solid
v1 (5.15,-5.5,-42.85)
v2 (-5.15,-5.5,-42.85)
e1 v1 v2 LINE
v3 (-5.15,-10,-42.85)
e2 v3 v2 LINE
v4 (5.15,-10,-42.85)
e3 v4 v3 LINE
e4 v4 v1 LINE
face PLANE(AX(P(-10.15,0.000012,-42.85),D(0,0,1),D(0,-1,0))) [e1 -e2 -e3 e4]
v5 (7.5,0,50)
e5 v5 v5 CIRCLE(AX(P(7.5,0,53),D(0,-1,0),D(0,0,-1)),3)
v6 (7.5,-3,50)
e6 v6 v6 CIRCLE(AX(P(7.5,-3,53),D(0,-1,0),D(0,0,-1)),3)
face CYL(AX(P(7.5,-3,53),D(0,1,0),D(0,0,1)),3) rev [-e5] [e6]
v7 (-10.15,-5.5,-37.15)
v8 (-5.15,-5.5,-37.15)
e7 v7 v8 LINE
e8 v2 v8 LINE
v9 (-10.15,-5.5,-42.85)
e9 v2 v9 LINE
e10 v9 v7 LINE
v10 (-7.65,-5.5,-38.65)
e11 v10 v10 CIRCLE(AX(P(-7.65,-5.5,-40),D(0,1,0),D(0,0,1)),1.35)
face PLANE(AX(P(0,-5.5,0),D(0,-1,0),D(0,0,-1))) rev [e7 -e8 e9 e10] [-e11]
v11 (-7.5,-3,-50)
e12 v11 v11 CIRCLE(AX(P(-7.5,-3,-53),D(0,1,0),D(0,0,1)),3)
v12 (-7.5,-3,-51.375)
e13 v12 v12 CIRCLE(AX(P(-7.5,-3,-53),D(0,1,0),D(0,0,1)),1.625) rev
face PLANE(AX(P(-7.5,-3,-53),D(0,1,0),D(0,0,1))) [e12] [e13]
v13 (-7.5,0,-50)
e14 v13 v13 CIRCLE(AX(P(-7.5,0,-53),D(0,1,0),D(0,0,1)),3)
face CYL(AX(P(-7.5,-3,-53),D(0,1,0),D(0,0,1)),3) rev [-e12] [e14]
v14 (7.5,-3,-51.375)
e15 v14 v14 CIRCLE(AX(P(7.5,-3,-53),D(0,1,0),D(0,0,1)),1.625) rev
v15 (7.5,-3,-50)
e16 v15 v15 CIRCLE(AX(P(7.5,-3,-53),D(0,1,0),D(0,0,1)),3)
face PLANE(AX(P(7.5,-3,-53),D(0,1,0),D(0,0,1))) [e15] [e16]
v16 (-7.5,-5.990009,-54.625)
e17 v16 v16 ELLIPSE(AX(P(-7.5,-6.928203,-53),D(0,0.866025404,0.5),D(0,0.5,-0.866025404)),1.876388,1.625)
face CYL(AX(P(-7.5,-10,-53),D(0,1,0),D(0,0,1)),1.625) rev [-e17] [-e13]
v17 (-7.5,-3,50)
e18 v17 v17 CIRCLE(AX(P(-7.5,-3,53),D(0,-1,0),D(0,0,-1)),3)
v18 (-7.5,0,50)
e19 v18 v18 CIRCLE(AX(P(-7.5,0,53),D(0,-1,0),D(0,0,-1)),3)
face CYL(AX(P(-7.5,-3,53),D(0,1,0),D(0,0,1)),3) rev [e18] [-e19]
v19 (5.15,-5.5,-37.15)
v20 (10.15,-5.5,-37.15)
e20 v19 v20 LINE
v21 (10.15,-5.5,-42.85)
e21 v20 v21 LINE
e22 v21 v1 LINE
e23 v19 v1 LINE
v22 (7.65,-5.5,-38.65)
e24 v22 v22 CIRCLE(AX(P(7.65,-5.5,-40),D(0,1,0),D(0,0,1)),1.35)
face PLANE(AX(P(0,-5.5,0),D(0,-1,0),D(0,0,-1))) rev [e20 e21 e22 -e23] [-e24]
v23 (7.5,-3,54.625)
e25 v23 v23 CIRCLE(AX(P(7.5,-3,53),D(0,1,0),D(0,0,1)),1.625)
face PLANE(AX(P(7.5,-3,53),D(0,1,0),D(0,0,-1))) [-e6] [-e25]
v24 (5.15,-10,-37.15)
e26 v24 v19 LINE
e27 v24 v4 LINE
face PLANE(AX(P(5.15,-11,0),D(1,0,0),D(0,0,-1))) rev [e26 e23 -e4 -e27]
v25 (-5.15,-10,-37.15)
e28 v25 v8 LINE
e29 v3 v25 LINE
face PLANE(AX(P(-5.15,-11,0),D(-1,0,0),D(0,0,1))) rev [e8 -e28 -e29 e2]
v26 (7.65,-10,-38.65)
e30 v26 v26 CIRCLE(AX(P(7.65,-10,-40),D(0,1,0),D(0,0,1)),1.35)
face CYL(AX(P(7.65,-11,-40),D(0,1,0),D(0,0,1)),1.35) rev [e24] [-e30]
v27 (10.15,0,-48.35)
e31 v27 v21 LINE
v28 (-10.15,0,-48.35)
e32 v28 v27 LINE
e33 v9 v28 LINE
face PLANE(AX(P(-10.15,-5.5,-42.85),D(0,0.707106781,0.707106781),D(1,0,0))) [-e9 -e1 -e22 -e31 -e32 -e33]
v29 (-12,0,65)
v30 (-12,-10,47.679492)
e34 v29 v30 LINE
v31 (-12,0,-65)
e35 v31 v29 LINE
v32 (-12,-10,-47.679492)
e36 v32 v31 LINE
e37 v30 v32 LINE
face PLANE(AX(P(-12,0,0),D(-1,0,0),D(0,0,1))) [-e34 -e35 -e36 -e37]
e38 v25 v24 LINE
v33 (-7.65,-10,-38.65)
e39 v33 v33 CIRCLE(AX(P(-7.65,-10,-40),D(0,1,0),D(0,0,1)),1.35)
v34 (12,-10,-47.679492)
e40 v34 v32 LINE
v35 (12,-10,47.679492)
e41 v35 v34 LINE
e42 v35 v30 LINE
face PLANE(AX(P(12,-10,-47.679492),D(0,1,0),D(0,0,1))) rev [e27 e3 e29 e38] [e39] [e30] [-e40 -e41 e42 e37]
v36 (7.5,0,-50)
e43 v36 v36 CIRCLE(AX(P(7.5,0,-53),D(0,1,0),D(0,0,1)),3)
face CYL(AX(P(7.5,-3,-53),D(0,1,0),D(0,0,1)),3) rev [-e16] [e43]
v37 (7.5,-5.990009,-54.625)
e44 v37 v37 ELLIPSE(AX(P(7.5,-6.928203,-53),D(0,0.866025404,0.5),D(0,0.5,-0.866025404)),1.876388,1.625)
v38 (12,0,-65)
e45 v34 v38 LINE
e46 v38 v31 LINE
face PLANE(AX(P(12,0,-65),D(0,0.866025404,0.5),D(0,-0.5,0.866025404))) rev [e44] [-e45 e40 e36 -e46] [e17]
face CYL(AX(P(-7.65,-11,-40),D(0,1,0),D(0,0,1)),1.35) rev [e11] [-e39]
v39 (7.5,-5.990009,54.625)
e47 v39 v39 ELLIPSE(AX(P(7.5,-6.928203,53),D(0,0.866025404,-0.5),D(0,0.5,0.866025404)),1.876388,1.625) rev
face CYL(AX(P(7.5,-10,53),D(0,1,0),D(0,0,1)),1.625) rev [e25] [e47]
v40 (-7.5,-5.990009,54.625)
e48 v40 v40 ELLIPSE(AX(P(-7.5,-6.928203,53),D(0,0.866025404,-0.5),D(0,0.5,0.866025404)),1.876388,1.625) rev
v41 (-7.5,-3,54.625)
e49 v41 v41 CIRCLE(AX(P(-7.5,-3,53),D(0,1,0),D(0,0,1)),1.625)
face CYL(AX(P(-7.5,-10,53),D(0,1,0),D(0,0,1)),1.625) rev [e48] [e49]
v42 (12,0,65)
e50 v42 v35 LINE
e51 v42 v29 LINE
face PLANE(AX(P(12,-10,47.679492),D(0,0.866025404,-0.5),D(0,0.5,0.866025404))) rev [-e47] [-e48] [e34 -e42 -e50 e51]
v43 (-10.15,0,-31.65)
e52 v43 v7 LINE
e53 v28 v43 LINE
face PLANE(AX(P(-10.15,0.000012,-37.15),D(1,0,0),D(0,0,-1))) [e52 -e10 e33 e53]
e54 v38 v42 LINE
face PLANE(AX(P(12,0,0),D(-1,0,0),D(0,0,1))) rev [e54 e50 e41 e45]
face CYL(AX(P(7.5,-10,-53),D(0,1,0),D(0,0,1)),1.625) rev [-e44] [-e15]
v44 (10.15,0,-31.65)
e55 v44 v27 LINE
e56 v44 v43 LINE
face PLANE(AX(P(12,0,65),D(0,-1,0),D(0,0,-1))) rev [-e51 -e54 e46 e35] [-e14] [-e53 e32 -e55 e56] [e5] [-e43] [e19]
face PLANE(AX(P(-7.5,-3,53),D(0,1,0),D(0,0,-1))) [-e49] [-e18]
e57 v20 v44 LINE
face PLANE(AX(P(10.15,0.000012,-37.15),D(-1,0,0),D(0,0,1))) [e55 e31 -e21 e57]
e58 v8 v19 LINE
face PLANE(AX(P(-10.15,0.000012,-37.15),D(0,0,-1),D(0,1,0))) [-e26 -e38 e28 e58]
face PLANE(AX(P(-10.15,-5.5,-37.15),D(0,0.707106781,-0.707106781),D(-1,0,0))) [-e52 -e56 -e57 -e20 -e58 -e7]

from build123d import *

# Parameters (mm, degrees)
BOSS_EXTRUDE1_DEPTH     = 12
CUT_EXTRUDE1_DEPTH      = 67.850579653
CUT_EXTRUDE1_DEPTH_BACK = 5.5
SKETCH2_W               = 20.3
SKETCH2_H               = 5.7
SKETCH3_W               = 10.3
SKETCH3_H               = 5.7
SKETCH3_R               = 1.35
CUT_EXTRUDE2_DEPTH      = 5.5
CHAMFER1_SIZE           = 5.5
SKETCH4_R               = 1.625
CUT_EXTRUDE3_DEPTH      = 67.850579653
SKETCH5_R               = 3
CUT_EXTRUDE4_DEPTH      = 3


with BuildPart() as part:
    # Sketch1 → Boss-Extrude1 (new, symmetric)
    with BuildSketch(Plane(origin=(0, 0, 0), x_dir=(0, 0, -1), z_dir=(1, 0, 0))):
        Polygon((-65, 0), (65, 0), (47.679491924, -10), (-47.679491924, -10), align=None)
    extrude(amount=BOSS_EXTRUDE1_DEPTH, both=True)

    # Sketch2 → Cut-Extrude1 (cut, two sides: drawn at the far end of the back side and taken through both)
    with BuildSketch(Plane(origin=(0, 0, 0), x_dir=(1, 0, 0), z_dir=(0, 1, 0)).offset(-CUT_EXTRUDE1_DEPTH_BACK)):
        with Locations((0, 40)):
            Rectangle(SKETCH2_W, SKETCH2_H)
    extrude(amount=CUT_EXTRUDE1_DEPTH + CUT_EXTRUDE1_DEPTH_BACK, mode=Mode.SUBTRACT)

    # Sketch3 → Cut-Extrude2 (cut)
    with BuildSketch(Plane(origin=(0, -5.5, 0), x_dir=(1, 0, 0), z_dir=(0, 1, 0))):
        with Locations((0, 40)):
            Rectangle(SKETCH3_W, SKETCH3_H)
        with Locations(Location((-7.65, 40, 0), (0, 0, 270))):
            Circle(SKETCH3_R)
        with Locations(Location((7.65, 40, 0), (0, 0, 270))):
            Circle(SKETCH3_R)
    extrude(amount=-CUT_EXTRUDE2_DEPTH, mode=Mode.SUBTRACT)

    # Chamfer1
    chamfer1_edges = [part.edges().sort_by_distance(p)[0] for p in [
        (0, 0, -37.15),
        (0, 0, -42.85),
    ]]
    chamfer(chamfer1_edges, length=CHAMFER1_SIZE - 0.0001)  # a hair under: the kernel refuses the full size

    # Sketch4 → Cut-Extrude3 (cut, through all)
    with BuildSketch(Plane(origin=(0, 0, 0), x_dir=(1, 0, 0), z_dir=(0, 1, 0))):
        with Locations(Location((-7.5, 53, 0), (0, 0, 270))):
            Circle(SKETCH4_R)
        with Locations(Location((7.5, 53, 0), (0, 0, 270))):
            Circle(SKETCH4_R)
    cut_extrude3 = extrude(amount=-CUT_EXTRUDE3_DEPTH, mode=Mode.SUBTRACT)

    # Sketch5 → Cut-Extrude4 (cut)
    with BuildSketch(Plane(origin=(0, 0, 0), x_dir=(1, 0, 0), z_dir=(0, 1, 0))):
        with Locations(Location((-7.5, 53, 0), (0, 0, 270))):
            Circle(SKETCH5_R)
        with Locations(Location((7.5, 53, 0), (0, 0, 270))):
            Circle(SKETCH5_R)
    cut_extrude4 = extrude(amount=-CUT_EXTRUDE4_DEPTH, mode=Mode.SUBTRACT)

    # Mirror1: Cut-Extrude3, Cut-Extrude4 across plane
    add(cut_extrude3.mirror(Plane.XY), mode=Mode.SUBTRACT)
    add(cut_extrude4.mirror(Plane.XY), mode=Mode.SUBTRACT)


solid = part.part
